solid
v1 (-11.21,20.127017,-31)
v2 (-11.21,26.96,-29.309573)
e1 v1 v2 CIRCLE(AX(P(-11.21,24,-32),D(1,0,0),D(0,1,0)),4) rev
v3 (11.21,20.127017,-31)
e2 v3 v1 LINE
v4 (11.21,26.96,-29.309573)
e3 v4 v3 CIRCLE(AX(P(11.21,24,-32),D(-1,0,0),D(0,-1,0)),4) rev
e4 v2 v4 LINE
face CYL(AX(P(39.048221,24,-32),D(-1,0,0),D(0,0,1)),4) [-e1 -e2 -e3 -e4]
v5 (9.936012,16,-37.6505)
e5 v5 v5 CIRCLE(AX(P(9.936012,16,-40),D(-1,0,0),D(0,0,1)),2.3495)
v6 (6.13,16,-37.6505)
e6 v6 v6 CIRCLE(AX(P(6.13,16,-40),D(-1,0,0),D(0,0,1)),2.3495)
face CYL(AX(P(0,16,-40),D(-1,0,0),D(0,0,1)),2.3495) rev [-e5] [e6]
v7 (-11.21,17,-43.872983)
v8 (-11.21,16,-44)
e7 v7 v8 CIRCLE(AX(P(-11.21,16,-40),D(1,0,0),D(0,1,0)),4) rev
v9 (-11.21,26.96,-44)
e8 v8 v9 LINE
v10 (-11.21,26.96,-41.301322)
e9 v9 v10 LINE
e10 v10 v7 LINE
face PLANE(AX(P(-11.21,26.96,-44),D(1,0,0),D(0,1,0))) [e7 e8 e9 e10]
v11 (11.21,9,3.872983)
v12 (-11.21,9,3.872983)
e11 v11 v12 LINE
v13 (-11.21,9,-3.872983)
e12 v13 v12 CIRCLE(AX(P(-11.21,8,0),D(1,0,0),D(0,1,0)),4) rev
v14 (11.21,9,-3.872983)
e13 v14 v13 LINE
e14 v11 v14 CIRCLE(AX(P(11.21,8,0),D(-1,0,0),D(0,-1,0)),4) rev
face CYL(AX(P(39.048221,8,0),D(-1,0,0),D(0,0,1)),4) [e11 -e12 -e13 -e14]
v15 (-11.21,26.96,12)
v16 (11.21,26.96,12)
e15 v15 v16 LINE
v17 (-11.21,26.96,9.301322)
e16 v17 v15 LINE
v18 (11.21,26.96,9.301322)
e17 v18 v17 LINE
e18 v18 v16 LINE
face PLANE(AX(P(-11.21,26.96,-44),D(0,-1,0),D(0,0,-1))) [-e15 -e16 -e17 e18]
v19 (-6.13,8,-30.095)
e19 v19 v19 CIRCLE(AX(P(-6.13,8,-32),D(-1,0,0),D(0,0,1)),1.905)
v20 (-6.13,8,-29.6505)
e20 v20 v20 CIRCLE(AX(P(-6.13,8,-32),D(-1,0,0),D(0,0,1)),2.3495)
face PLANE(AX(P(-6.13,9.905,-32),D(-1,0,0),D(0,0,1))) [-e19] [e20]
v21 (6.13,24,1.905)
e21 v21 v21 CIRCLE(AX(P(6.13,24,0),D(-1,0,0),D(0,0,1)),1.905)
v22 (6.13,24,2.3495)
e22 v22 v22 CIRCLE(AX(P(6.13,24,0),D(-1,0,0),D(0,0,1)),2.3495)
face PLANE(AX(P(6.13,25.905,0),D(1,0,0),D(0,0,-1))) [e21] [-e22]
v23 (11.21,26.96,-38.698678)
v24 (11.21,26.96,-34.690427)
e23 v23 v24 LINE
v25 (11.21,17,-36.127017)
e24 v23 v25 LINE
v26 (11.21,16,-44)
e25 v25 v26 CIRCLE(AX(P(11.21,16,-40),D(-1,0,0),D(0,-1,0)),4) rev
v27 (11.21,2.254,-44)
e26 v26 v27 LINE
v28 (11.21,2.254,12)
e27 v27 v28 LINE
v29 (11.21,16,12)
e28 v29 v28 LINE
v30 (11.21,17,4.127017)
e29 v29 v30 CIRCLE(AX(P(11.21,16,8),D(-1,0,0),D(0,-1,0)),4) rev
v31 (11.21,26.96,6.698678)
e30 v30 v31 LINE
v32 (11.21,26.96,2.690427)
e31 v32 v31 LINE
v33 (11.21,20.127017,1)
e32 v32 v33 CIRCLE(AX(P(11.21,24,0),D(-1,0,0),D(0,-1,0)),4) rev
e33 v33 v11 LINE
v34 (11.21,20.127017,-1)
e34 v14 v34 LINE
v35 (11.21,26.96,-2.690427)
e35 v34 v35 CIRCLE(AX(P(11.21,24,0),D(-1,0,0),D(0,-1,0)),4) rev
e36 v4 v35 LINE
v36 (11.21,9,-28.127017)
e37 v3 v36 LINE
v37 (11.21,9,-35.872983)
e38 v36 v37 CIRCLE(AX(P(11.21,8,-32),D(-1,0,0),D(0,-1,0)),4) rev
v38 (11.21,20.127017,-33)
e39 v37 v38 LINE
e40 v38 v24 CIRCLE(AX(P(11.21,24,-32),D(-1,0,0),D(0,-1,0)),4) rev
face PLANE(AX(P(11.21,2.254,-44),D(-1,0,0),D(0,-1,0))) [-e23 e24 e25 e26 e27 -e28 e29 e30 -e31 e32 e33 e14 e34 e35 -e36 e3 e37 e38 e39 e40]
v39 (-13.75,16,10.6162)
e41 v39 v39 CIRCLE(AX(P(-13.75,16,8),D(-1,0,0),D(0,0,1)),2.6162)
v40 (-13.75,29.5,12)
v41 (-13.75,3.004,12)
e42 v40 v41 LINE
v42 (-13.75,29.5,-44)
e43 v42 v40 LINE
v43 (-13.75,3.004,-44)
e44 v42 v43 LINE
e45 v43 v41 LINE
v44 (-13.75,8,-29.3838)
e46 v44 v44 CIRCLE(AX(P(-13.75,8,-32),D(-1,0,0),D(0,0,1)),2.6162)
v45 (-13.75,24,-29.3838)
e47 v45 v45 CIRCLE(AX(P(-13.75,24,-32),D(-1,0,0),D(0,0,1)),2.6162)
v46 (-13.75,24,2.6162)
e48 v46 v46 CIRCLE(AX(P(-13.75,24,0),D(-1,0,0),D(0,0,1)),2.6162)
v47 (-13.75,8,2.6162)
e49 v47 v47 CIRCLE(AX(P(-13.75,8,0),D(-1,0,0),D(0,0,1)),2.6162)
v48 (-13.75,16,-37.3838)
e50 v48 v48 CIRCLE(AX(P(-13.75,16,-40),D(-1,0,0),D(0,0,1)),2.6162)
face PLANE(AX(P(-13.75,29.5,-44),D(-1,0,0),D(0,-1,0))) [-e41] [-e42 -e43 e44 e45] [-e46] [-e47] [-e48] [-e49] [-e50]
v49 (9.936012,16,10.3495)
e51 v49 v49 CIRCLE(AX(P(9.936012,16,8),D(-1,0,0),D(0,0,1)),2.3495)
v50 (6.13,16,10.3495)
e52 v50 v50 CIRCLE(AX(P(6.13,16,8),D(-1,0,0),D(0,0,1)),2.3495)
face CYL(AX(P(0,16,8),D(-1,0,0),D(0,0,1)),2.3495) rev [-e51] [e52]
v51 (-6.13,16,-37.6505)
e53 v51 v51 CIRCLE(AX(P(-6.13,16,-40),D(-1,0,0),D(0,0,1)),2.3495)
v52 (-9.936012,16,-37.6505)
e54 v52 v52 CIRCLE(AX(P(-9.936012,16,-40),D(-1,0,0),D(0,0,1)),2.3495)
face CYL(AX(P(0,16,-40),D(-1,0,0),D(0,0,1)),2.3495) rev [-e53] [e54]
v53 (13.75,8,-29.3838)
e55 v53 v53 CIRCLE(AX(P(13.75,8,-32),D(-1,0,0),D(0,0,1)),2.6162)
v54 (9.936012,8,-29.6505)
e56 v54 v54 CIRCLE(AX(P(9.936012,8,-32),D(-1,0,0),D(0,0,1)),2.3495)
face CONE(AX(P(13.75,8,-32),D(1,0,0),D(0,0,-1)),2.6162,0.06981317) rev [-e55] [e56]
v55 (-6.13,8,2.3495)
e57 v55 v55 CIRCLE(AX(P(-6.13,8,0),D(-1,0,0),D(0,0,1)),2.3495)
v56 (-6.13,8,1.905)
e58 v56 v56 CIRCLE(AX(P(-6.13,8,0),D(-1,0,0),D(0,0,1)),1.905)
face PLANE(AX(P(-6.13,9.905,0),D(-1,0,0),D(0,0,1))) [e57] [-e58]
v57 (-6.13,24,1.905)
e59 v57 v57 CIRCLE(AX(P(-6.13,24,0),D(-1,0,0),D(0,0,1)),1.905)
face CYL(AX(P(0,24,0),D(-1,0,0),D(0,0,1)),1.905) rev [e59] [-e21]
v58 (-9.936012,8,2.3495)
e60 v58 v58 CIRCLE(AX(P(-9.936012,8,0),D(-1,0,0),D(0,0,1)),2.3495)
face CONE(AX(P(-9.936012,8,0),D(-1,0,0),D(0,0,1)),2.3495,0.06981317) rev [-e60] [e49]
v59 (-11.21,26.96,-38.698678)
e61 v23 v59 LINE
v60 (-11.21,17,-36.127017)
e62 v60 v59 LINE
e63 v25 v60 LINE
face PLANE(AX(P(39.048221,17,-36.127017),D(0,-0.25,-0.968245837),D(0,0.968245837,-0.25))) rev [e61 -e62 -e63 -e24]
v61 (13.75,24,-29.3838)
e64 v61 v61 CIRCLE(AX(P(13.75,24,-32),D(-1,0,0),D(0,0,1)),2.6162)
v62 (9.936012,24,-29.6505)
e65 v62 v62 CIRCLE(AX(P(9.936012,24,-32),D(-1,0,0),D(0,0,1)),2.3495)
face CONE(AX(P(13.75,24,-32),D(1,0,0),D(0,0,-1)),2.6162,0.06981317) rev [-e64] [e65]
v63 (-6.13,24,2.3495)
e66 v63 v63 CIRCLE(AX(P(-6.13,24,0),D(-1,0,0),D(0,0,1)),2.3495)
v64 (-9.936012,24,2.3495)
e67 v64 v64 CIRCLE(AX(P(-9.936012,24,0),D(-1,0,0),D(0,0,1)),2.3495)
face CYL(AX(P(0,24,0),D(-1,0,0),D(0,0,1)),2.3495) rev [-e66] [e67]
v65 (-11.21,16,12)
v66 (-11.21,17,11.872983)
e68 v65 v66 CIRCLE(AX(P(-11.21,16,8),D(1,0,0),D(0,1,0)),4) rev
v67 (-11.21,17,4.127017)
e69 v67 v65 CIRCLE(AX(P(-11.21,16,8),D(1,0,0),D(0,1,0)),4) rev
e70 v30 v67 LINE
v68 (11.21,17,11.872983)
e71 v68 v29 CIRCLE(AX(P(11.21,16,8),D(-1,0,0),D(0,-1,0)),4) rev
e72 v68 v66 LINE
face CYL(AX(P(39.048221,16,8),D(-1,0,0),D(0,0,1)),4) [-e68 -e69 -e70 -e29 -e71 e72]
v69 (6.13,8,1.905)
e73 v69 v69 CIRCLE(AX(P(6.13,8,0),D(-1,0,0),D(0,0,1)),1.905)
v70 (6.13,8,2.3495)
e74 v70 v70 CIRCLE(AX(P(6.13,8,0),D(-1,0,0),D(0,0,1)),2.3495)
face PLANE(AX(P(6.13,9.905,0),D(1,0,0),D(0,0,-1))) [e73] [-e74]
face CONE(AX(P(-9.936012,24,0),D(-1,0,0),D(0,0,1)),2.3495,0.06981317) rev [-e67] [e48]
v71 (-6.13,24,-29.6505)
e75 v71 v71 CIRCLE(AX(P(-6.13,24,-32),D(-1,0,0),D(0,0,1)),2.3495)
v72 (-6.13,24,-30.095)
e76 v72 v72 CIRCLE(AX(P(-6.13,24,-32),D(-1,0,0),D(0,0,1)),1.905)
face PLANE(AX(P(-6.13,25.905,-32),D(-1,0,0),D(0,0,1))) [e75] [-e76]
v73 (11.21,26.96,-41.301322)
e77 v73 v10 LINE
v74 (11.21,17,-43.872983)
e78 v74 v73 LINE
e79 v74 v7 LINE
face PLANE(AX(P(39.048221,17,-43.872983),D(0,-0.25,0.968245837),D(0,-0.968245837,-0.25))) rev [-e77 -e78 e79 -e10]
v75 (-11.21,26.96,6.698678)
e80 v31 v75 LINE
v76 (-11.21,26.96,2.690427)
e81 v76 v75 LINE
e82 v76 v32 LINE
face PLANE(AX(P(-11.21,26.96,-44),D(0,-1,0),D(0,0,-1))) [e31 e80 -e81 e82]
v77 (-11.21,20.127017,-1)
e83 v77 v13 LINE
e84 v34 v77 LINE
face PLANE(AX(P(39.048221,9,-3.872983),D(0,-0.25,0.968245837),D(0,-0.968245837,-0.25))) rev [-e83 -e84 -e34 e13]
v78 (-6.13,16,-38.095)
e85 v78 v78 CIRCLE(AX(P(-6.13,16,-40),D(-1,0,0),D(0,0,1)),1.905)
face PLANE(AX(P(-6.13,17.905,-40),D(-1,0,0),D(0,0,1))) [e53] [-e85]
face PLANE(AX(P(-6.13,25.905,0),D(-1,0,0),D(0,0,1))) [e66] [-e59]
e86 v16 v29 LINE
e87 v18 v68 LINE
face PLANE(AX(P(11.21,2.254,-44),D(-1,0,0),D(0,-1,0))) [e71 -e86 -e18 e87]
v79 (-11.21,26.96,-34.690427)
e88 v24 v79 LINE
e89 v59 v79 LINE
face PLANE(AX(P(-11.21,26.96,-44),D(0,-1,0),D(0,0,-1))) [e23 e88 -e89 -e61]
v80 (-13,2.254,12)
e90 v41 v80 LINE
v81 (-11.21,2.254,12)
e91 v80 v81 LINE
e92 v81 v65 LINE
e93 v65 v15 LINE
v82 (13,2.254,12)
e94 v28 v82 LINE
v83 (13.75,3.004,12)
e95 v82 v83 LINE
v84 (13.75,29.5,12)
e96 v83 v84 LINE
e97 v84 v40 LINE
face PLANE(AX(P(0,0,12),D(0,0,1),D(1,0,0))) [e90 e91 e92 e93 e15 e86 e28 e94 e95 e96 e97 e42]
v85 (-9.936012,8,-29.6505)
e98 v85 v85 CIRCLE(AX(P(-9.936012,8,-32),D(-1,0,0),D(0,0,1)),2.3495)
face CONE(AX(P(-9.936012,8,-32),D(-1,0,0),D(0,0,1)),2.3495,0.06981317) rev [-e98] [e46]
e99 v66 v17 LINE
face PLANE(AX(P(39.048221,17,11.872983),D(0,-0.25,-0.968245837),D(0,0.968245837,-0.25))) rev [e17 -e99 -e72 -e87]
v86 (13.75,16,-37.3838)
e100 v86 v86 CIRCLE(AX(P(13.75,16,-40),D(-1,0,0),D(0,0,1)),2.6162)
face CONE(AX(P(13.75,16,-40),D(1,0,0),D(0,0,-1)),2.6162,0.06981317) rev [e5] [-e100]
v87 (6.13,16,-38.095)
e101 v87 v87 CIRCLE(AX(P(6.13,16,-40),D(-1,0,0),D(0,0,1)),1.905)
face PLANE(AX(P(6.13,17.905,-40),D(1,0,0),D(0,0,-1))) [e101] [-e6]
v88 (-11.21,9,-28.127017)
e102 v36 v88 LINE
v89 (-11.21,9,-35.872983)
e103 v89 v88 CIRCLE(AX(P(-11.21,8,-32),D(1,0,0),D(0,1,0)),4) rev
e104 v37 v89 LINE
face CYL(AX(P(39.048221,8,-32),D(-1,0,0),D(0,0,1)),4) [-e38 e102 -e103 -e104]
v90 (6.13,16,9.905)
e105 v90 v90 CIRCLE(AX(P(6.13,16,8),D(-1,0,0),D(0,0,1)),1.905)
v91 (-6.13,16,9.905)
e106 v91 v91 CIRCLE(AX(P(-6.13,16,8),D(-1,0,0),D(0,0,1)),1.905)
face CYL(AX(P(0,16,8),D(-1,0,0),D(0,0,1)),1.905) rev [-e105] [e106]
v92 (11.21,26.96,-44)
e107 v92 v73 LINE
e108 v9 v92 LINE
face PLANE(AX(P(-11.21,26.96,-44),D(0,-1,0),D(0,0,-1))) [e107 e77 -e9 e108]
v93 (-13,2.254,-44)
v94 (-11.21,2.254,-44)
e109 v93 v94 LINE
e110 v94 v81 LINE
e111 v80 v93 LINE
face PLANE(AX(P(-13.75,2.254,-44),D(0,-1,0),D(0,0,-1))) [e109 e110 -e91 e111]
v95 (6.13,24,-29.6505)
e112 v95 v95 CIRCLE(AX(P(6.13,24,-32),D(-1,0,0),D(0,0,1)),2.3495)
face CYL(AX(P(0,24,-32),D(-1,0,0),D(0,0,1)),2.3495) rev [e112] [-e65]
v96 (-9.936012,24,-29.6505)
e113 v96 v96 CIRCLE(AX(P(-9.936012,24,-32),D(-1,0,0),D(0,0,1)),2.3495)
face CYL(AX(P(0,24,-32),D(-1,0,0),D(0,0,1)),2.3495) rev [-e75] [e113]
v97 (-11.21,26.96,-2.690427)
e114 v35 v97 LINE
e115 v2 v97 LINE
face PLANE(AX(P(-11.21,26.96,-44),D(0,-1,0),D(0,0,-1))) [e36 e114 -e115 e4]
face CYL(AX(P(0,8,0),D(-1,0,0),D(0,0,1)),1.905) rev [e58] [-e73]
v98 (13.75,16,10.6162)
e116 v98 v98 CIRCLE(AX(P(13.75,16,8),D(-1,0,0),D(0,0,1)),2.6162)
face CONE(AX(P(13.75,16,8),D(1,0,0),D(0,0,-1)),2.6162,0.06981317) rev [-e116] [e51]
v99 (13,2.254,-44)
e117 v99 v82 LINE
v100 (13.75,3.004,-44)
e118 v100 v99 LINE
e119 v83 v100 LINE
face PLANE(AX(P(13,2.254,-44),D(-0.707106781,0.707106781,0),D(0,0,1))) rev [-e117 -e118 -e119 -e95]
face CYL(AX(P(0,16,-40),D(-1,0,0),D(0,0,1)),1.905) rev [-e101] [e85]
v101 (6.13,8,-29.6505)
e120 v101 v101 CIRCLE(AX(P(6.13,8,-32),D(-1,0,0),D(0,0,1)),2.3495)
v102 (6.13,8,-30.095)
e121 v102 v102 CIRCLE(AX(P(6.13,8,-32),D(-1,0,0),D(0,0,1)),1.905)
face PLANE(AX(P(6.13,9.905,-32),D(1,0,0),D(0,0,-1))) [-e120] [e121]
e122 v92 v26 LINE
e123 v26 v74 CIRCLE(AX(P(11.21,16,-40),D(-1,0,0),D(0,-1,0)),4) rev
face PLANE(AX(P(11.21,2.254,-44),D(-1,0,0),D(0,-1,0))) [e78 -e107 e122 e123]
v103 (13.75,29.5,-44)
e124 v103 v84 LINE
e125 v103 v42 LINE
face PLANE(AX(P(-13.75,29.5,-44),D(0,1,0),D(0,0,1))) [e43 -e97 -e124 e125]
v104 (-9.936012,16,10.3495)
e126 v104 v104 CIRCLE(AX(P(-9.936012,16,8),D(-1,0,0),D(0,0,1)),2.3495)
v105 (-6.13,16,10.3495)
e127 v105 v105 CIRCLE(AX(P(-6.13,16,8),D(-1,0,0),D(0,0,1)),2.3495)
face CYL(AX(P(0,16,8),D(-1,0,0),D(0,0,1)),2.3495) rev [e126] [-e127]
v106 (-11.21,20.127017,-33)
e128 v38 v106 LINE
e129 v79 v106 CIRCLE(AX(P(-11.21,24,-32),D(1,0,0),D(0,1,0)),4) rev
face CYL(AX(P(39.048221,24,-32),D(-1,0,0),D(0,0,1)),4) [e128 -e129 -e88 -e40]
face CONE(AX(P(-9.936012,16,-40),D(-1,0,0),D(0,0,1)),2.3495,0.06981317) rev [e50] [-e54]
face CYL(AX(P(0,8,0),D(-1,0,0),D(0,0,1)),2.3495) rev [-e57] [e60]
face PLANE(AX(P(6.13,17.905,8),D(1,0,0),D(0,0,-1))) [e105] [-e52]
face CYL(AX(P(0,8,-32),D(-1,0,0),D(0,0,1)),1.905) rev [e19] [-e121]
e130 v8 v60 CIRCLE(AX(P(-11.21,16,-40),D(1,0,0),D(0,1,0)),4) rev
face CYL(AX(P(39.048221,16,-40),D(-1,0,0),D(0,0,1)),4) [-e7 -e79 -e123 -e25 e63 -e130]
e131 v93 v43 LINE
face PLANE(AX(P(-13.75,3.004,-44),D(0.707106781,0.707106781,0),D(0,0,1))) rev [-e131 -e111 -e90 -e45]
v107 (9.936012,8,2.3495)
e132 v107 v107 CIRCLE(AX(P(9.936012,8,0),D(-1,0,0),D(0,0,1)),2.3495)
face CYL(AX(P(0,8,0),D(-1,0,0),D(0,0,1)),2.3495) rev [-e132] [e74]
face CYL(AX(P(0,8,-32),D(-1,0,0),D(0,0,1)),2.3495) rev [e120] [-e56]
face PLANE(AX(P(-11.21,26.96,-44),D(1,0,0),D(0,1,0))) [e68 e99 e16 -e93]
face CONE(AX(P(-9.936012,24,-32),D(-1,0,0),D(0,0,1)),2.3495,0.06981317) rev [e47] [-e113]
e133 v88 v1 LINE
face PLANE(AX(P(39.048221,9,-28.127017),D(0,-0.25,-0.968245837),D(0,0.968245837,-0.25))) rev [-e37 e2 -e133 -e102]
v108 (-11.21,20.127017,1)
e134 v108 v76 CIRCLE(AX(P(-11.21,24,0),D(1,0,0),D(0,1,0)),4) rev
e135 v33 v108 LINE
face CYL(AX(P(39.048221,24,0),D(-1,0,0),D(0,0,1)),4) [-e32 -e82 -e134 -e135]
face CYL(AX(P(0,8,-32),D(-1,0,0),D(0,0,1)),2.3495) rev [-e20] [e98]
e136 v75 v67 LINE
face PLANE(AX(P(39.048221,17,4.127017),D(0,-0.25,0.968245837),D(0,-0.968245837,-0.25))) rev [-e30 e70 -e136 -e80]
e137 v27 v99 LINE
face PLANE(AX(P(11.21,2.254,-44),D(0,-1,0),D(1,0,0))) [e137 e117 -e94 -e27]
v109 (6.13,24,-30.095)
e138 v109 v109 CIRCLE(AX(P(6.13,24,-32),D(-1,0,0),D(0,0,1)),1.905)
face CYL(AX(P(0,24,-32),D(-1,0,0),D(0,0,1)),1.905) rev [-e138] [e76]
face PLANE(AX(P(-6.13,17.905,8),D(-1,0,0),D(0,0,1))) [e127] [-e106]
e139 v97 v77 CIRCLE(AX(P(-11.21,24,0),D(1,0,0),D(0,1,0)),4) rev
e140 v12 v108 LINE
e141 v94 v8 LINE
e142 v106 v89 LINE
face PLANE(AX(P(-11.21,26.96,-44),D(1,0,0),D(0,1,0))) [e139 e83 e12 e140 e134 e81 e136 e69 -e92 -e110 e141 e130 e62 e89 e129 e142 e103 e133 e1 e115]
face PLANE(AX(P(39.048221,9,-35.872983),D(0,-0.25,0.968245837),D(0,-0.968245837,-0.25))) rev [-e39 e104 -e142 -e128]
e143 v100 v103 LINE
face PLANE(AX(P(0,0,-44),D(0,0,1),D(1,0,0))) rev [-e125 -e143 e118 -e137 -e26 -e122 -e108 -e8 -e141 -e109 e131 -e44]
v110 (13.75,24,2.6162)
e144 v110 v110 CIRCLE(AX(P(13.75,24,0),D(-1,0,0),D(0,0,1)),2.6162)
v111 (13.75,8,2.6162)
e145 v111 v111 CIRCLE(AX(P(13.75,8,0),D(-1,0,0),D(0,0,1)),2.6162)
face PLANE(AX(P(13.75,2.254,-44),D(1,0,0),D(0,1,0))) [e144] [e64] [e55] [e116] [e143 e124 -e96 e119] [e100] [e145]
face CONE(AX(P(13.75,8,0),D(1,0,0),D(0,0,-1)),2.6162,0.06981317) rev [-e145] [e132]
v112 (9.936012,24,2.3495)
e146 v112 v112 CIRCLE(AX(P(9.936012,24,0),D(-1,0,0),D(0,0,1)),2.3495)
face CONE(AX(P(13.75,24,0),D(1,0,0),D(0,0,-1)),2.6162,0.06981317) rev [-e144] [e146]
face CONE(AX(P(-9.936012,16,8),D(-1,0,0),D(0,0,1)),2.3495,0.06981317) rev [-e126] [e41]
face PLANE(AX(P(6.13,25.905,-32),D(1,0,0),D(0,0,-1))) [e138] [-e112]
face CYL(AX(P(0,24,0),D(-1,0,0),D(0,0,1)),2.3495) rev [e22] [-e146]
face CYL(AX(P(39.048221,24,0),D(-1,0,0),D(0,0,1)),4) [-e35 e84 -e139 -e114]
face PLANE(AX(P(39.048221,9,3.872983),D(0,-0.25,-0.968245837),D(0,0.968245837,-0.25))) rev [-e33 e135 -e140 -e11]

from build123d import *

# Parameters (mm, degrees)
BOSS_EXTRUDE1_DEPTH             = 12
BOSS_EXTRUDE1_DEPTH_BACK        = 44
BOSS_EXTRUDE2_REACH             = 56.729
BOSS_EXTRUDE2_DIRECTION_2_REACH = 56.729
CHAMFER1_SIZE                   = 0.75


# Read off the part's stored shape, not the designer's step: Sketch-Pattern1
with BuildPart() as part:
    # Sketch1 → Boss-Extrude1 (new, two sides: drawn at the far end of the back side and taken through both)
    with BuildSketch(Plane.XY.offset(-BOSS_EXTRUDE1_DEPTH_BACK)):
        Polygon((-13.75, 29.5), (13.75, 29.5), (13.75, 2.254), (11.21, 2.254), (11.21, 26.96), (-11.21, 26.96), (-11.21, 2.254), (-13.75, 2.254), align=None)
    extrude(amount=BOSS_EXTRUDE1_DEPTH + BOSS_EXTRUDE1_DEPTH_BACK)

    # Boss-Extrude2: up to this face of the body (flat: up to its plane)
    boss_extrude2_end = Plane(part.part.faces().sort_by_distance((13.75, 15.877, -16))[0])
    # Sketch2 → Boss-Extrude2 (add, up to the picked face)
    with BuildSketch(Plane(origin=(0, 0, 0), x_dir=(0, 0, -1), z_dir=(1, 0, 0)), mode=Mode.PRIVATE) as boss_extrude2_sk1:
        with BuildLine():
            Line((-3.872983346, 9), (-1, 20.127016654))
            ThreePointArc((-1, 20.127016654), (0, 28), (1, 20.127016654))
            Line((1, 20.127016654), (3.872983346, 9))
            ThreePointArc((3.872983346, 9), (0, 4), (-3.872983346, 9))
        make_face()
    boss_extrude2_tool1 = split(extrude(boss_extrude2_sk1.sketch, amount=BOSS_EXTRUDE2_REACH, mode=Mode.PRIVATE), bisect_by=boss_extrude2_end, keep=Keep.BOTH, mode=Mode.PRIVATE)
    # Sketch2 → Boss-Extrude2 (add, up to the picked face)
    with BuildSketch(Plane(origin=(0, 0, 0), x_dir=(0, 0, -1), z_dir=(1, 0, 0)), mode=Mode.PRIVATE) as boss_extrude2_sk2:
        with BuildLine():
            Line((-4.127016654, 17), (-6.698677596, 26.96))
            Line((-6.698677596, 26.96), (-9.301322404, 26.96))
            Line((-9.301322404, 26.96), (-11.872983346, 17))
            ThreePointArc((-11.872983346, 17), (-8, 12), (-4.127016654, 17))
        make_face()
    boss_extrude2_tool2 = split(extrude(boss_extrude2_sk2.sketch, amount=BOSS_EXTRUDE2_REACH, mode=Mode.PRIVATE), bisect_by=boss_extrude2_end, keep=Keep.BOTH, mode=Mode.PRIVATE)
    # Sketch2 → Boss-Extrude2 (add, up to the picked face)
    with BuildSketch(Plane(origin=(0, 0, 0), x_dir=(0, 0, -1), z_dir=(1, 0, 0)), mode=Mode.PRIVATE) as boss_extrude2_sk3:
        with BuildLine():
            Line((41.301322404, 26.96), (38.698677596, 26.96))
            Line((38.698677596, 26.96), (36.127016654, 17))
            ThreePointArc((36.127016654, 17), (40, 12), (43.872983346, 17))
            Line((43.872983346, 17), (41.301322404, 26.96))
        make_face()
    boss_extrude2_tool3 = split(extrude(boss_extrude2_sk3.sketch, amount=BOSS_EXTRUDE2_REACH, mode=Mode.PRIVATE), bisect_by=boss_extrude2_end, keep=Keep.BOTH, mode=Mode.PRIVATE)
    # Sketch2 → Boss-Extrude2 (add, up to the picked face)
    with BuildSketch(Plane(origin=(0, 0, 0), x_dir=(0, 0, -1), z_dir=(1, 0, 0)), mode=Mode.PRIVATE) as boss_extrude2_sk4:
        with BuildLine():
            Line((28.127016654, 9), (31, 20.127016654))
            ThreePointArc((31, 20.127016654), (32, 28), (33, 20.127016654))
            Line((33, 20.127016654), (35.872983346, 9))
            ThreePointArc((35.872983346, 9), (32, 4), (28.127016654, 9))
        make_face()
    boss_extrude2_tool4 = split(extrude(boss_extrude2_sk4.sketch, amount=BOSS_EXTRUDE2_REACH, mode=Mode.PRIVATE), bisect_by=boss_extrude2_end, keep=Keep.BOTH, mode=Mode.PRIVATE)
    add(boss_extrude2_tool1.solids().sort_by(Axis((0, 15.717101, 0), (1, 0, 0)))[0])
    add(boss_extrude2_tool2.solids().sort_by(Axis((0, 18.682958, 8), (1, 0, 0)))[0])
    add(boss_extrude2_tool3.solids().sort_by(Axis((0, 18.682958, -40), (1, 0, 0)))[0])
    add(boss_extrude2_tool4.solids().sort_by(Axis((0, 15.717101, -32), (1, 0, 0)))[0])

    # Boss-Extrude2 direction 2: up to this face of the body (flat: up to its plane)
    boss_extrude2_direction_2_end = Plane(part.part.faces().sort_by_distance((-13.75, 15.877, -16))[0])
    # Sketch2 → Boss-Extrude2 direction 2 (add, up to the picked face)
    with BuildSketch(Plane(origin=(0, 0, 0), x_dir=(0, 0, -1), z_dir=(1, 0, 0)), mode=Mode.PRIVATE) as boss_extrude2_direction_2_sk1:
        with BuildLine():
            Line((-3.872983346, 9), (-1, 20.127016654))
            ThreePointArc((-1, 20.127016654), (0, 28), (1, 20.127016654))
            Line((1, 20.127016654), (3.872983346, 9))
            ThreePointArc((3.872983346, 9), (0, 4), (-3.872983346, 9))
        make_face()
    boss_extrude2_direction_2_tool1 = split(extrude(boss_extrude2_direction_2_sk1.sketch, amount=-BOSS_EXTRUDE2_DIRECTION_2_REACH, mode=Mode.PRIVATE), bisect_by=boss_extrude2_direction_2_end, keep=Keep.BOTH, mode=Mode.PRIVATE)
    # Sketch2 → Boss-Extrude2 direction 2 (add, up to the picked face)
    with BuildSketch(Plane(origin=(0, 0, 0), x_dir=(0, 0, -1), z_dir=(1, 0, 0)), mode=Mode.PRIVATE) as boss_extrude2_direction_2_sk2:
        with BuildLine():
            Line((-4.127016654, 17), (-6.698677596, 26.96))
            Line((-6.698677596, 26.96), (-9.301322404, 26.96))
            Line((-9.301322404, 26.96), (-11.872983346, 17))
            ThreePointArc((-11.872983346, 17), (-8, 12), (-4.127016654, 17))
        make_face()
    boss_extrude2_direction_2_tool2 = split(extrude(boss_extrude2_direction_2_sk2.sketch, amount=-BOSS_EXTRUDE2_DIRECTION_2_REACH, mode=Mode.PRIVATE), bisect_by=boss_extrude2_direction_2_end, keep=Keep.BOTH, mode=Mode.PRIVATE)
    # Sketch2 → Boss-Extrude2 direction 2 (add, up to the picked face)
    with BuildSketch(Plane(origin=(0, 0, 0), x_dir=(0, 0, -1), z_dir=(1, 0, 0)), mode=Mode.PRIVATE) as boss_extrude2_direction_2_sk3:
        with BuildLine():
            Line((41.301322404, 26.96), (38.698677596, 26.96))
            Line((38.698677596, 26.96), (36.127016654, 17))
            ThreePointArc((36.127016654, 17), (40, 12), (43.872983346, 17))
            Line((43.872983346, 17), (41.301322404, 26.96))
        make_face()
    boss_extrude2_direction_2_tool3 = split(extrude(boss_extrude2_direction_2_sk3.sketch, amount=-BOSS_EXTRUDE2_DIRECTION_2_REACH, mode=Mode.PRIVATE), bisect_by=boss_extrude2_direction_2_end, keep=Keep.BOTH, mode=Mode.PRIVATE)
    # Sketch2 → Boss-Extrude2 direction 2 (add, up to the picked face)
    with BuildSketch(Plane(origin=(0, 0, 0), x_dir=(0, 0, -1), z_dir=(1, 0, 0)), mode=Mode.PRIVATE) as boss_extrude2_direction_2_sk4:
        with BuildLine():
            Line((28.127016654, 9), (31, 20.127016654))
            ThreePointArc((31, 20.127016654), (32, 28), (33, 20.127016654))
            Line((33, 20.127016654), (35.872983346, 9))
            ThreePointArc((35.872983346, 9), (32, 4), (28.127016654, 9))
        make_face()
    boss_extrude2_direction_2_tool4 = split(extrude(boss_extrude2_direction_2_sk4.sketch, amount=-BOSS_EXTRUDE2_DIRECTION_2_REACH, mode=Mode.PRIVATE), bisect_by=boss_extrude2_direction_2_end, keep=Keep.BOTH, mode=Mode.PRIVATE)
    add(boss_extrude2_direction_2_tool1.solids().sort_by(Axis((0, 15.717101, 0), (-1, 0, 0)))[0])
    add(boss_extrude2_direction_2_tool2.solids().sort_by(Axis((0, 18.682958, 8), (-1, 0, 0)))[0])
    add(boss_extrude2_direction_2_tool3.solids().sort_by(Axis((0, 18.682958, -40), (-1, 0, 0)))[0])
    add(boss_extrude2_direction_2_tool4.solids().sort_by(Axis((0, 15.717101, -32), (-1, 0, 0)))[0])


with BuildPart() as body_2:
    # Sketch5 → Revolve1 (revolve)
    with BuildSketch(Plane.XY.offset(8), mode=Mode.PRIVATE) as revolve1_sk:
        Polygon((6.13, 17.905), (6.13, 18.3495), (9.936012309, 18.3495), (13.75, 18.6162), (13.75, 16), (-13.75, 16), (-13.75, 18.6162), (-9.936012309, 18.3495), (-6.13, 18.3495), (-6.13, 17.905), align=None)
    revolve(revolve1_sk.sketch.rotate(Axis((0, 16, 8), (1, 0, 0)), 90), axis=Axis((0, 16, 8), (1, 0, 0)))


with BuildPart() as body_3:
    # Sketch-Pattern1 outline → Sketch-Pattern1 (revolve)
    with BuildSketch(Plane(origin=(0, 16, -40), x_dir=(0, 1, 0), z_dir=(0, 0, -1))):
        Polygon((0, 13.75), (0, -13.75), (2.6162, -13.75), (2.3495, -9.936012309), (2.3495, -6.13), (1.905, -6.13), (1.905, 6.13), (2.3495, 6.13), (2.3495, 9.936012309), (2.6162, 13.75), align=None)
    revolve(axis=Axis((0, 16, -40), (1, 0, 0)))


with BuildPart() as body_4:
    # Sketch-Pattern1 2 outline → Sketch-Pattern1 2 (revolve)
    with BuildSketch(Plane(origin=(0, 8, -32), x_dir=(0, 1, 0), z_dir=(0, 0, -1))):
        Polygon((0, 13.75), (0, -13.75), (2.6162, -13.75), (2.3495, -9.936012309), (2.3495, -6.13), (1.905, -6.13), (1.905, 6.13), (2.3495, 6.13), (2.3495, 9.936012309), (2.6162, 13.75), align=None)
    revolve(axis=Axis((0, 8, -32), (1, 0, 0)))


with BuildPart() as body_5:
    # Sketch-Pattern1 3 outline → Sketch-Pattern1 3 (revolve)
    with BuildSketch(Plane(origin=(0, 24, -32), x_dir=(0, 1, 0), z_dir=(0, 0, -1))):
        Polygon((0, 13.75), (0, -13.75), (2.6162, -13.75), (2.3495, -9.936012309), (2.3495, -6.13), (1.905, -6.13), (1.905, 6.13), (2.3495, 6.13), (2.3495, 9.936012309), (2.6162, 13.75), align=None)
    revolve(axis=Axis((0, 24, -32), (1, 0, 0)))


with BuildPart() as body_6:
    # Sketch-Pattern1 4 outline → Sketch-Pattern1 4 (revolve)
    with BuildSketch(Plane(origin=(0, 8, 0), x_dir=(0, 1, 0), z_dir=(0, 0, -1))):
        Polygon((0, 13.75), (0, -13.75), (2.6162, -13.75), (2.3495, -9.936012309), (2.3495, -6.13), (1.905, -6.13), (1.905, 6.13), (2.3495, 6.13), (2.3495, 9.936012309), (2.6162, 13.75), align=None)
    revolve(axis=Axis((0, 8, 0), (1, 0, 0)))


with BuildPart() as body_7:
    # Sketch-Pattern1 5 outline → Sketch-Pattern1 5 (revolve)
    with BuildSketch(Plane(origin=(0, 24, 0), x_dir=(0, 1, 0), z_dir=(0, 0, -1))):
        Polygon((0, 13.75), (0, -13.75), (2.6162, -13.75), (2.3495, -9.936012309), (2.3495, -6.13), (1.905, -6.13), (1.905, 6.13), (2.3495, 6.13), (2.3495, 9.936012309), (2.6162, 13.75), align=None)
    revolve(axis=Axis((0, 24, 0), (1, 0, 0)))


with BuildPart() as part_1:
    add(part.part)

    # Combine1: cut body 2, body 7, body 6, body 5, body 4, body 3
    add(body_2.part, mode=Mode.SUBTRACT)
    add(body_7.part, mode=Mode.SUBTRACT)
    add(body_6.part, mode=Mode.SUBTRACT)
    add(body_5.part, mode=Mode.SUBTRACT)
    add(body_4.part, mode=Mode.SUBTRACT)
    add(body_3.part, mode=Mode.SUBTRACT)

    # Chamfer1
    chamfer1_edges = [part_1.edges().sort_by_distance(p)[0] for p in [
        (-13.75, 2.254, -16),
        (13.75, 2.254, -16),
    ]]
    chamfer(chamfer1_edges, length=CHAMFER1_SIZE)


solid = part_1.part
